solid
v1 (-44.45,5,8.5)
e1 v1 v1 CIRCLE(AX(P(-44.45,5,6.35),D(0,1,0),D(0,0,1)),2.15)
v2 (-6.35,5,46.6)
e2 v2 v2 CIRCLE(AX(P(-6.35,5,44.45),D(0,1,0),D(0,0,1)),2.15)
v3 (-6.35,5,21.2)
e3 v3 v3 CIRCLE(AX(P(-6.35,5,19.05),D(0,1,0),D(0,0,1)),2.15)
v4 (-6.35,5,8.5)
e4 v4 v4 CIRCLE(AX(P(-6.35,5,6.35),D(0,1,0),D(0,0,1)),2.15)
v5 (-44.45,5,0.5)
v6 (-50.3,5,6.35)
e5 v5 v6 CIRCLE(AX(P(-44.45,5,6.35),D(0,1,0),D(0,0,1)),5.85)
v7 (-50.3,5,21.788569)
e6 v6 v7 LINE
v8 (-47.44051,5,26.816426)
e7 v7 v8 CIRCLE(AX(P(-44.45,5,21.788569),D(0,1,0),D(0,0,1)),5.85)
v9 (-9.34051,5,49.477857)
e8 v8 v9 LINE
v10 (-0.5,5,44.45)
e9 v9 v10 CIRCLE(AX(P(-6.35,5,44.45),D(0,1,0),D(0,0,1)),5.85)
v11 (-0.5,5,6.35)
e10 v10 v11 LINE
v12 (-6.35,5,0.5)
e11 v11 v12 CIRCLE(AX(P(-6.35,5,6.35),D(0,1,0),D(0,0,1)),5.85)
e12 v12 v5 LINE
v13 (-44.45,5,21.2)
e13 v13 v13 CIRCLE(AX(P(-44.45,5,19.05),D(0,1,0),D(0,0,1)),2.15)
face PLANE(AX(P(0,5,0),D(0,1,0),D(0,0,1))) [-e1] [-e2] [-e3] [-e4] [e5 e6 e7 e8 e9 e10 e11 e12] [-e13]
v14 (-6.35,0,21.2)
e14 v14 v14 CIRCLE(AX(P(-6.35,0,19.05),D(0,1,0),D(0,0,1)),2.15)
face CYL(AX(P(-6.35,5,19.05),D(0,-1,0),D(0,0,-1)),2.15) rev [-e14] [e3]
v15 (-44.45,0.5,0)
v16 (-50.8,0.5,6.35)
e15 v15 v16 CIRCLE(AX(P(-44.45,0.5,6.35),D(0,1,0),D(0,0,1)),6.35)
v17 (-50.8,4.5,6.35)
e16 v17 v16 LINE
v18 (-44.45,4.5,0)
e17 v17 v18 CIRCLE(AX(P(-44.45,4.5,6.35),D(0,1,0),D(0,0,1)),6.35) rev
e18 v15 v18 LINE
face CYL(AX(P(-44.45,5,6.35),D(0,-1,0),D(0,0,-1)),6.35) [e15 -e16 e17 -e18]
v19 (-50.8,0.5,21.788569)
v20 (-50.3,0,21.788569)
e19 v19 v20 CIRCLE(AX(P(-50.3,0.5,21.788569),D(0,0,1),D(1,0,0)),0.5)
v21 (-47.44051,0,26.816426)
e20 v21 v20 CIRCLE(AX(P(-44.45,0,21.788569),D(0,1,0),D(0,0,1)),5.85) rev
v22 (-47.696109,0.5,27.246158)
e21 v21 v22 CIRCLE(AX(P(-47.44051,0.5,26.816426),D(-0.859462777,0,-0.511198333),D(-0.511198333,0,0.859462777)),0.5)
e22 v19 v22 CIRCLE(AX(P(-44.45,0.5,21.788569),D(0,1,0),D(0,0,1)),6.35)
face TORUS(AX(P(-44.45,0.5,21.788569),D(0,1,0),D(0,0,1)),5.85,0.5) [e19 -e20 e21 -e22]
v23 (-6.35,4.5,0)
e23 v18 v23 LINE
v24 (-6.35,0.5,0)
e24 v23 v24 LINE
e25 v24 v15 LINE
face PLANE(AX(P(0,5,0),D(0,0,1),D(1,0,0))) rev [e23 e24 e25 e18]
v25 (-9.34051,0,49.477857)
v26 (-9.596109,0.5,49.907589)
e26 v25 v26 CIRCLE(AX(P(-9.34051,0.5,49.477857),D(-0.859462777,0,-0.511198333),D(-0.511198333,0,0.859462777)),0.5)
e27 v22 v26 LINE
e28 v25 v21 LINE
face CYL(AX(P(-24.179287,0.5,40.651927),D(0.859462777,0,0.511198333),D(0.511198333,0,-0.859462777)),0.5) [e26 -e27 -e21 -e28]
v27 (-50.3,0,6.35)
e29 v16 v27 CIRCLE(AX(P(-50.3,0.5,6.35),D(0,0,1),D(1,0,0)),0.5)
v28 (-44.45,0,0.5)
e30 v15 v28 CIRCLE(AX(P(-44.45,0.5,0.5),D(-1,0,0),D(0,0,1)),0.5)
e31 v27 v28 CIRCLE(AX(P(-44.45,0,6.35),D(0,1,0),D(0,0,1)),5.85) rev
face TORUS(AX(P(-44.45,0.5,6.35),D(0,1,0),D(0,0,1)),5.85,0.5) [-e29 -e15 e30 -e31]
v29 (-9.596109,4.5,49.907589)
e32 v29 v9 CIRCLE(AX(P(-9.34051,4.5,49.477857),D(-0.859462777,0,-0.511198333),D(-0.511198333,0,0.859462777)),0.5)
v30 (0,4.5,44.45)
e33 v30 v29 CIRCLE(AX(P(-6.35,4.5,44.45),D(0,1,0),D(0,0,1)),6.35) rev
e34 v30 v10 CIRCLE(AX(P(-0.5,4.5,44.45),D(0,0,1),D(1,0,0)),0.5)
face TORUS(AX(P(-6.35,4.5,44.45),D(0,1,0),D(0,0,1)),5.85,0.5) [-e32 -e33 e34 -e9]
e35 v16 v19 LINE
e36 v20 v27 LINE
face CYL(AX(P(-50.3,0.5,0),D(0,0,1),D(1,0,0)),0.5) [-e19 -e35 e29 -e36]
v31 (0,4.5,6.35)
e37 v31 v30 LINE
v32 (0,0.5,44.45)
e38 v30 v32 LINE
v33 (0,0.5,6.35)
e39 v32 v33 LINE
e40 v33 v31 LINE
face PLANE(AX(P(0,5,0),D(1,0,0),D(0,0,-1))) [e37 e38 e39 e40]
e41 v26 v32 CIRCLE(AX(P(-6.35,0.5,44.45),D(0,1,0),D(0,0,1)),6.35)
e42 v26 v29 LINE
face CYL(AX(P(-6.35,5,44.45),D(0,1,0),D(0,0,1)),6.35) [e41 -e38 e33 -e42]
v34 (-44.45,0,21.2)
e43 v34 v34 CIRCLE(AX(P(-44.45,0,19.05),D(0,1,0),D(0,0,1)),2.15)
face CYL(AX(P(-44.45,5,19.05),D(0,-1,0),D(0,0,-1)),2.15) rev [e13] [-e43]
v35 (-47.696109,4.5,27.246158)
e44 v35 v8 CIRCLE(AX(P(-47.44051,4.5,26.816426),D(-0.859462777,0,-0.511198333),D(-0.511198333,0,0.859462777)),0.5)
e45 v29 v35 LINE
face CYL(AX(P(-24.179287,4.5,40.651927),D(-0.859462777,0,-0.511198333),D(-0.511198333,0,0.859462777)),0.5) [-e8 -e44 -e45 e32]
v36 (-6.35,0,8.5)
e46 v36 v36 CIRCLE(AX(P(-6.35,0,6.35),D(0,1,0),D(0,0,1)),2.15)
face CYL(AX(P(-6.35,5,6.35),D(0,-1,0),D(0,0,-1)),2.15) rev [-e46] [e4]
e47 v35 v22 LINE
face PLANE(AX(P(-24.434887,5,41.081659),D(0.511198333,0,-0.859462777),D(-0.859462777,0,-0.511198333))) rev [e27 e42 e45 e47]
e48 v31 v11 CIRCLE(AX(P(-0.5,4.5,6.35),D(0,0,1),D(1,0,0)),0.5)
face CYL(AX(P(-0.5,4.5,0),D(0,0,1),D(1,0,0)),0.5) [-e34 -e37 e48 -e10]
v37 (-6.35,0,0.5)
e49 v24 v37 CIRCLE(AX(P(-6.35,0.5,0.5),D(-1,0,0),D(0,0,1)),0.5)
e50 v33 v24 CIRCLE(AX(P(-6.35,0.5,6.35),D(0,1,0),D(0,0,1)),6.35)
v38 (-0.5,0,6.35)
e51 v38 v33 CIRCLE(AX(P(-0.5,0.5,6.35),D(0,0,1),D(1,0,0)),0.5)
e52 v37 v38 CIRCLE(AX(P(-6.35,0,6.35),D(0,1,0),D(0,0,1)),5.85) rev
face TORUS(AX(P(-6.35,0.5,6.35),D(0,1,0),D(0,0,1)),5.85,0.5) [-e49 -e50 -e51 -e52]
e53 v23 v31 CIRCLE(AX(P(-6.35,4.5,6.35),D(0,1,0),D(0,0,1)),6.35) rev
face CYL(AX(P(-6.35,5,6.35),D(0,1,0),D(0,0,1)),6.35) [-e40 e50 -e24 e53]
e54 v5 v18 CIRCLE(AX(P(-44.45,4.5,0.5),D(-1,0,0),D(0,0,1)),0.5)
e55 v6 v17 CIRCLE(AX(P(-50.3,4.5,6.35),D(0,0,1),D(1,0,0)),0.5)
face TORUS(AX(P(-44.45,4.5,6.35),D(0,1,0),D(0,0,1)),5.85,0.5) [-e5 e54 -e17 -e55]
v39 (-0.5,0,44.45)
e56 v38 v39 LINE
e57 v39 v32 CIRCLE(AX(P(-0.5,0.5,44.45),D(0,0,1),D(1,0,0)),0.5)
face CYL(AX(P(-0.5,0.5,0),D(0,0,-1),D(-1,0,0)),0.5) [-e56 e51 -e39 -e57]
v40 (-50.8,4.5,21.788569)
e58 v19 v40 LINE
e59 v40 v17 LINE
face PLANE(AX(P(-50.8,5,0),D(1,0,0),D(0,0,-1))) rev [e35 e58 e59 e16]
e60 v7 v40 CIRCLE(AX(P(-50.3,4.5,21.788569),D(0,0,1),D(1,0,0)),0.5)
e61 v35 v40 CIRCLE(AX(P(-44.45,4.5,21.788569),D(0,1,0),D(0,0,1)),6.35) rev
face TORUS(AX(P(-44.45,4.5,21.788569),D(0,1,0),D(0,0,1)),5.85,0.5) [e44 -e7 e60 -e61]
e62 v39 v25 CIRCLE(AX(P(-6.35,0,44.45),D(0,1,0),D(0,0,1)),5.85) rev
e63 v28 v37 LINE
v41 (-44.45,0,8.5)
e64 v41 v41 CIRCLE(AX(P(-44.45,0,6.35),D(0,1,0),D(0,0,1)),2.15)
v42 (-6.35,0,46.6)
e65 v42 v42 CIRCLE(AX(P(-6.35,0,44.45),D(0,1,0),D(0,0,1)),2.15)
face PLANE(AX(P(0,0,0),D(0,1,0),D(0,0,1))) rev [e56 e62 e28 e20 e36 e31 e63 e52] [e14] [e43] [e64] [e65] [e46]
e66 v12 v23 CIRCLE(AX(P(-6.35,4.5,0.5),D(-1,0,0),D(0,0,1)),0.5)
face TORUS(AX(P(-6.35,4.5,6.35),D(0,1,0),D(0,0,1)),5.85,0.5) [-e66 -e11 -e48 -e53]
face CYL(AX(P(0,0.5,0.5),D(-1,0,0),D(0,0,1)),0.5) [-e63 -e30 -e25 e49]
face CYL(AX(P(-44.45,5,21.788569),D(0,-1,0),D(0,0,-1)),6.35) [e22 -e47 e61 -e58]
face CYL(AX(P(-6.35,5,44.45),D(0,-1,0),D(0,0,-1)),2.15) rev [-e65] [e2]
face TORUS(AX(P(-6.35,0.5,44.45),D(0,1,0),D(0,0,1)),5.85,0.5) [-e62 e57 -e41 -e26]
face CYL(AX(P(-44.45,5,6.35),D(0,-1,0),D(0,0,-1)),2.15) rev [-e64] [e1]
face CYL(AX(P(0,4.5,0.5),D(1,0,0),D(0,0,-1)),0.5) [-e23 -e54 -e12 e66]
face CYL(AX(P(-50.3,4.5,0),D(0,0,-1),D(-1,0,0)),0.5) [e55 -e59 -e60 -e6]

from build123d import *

# Parameters (mm, degrees)
SKETCH1_W           = 50.8
SKETCH1_H           = 25.4
SKETCH1_R           = 2.15
BOSS_EXTRUDE1_DEPTH = 5
FILLET1_R           = 6.35
FILLET2_R           = 6.35
FILLET3_R           = 0.5


with BuildPart() as part:
    # Sketch1 → Boss-Extrude1 (new body)
    # profile 1 of 2: a face of its own
    with BuildSketch(Plane(origin=(0, 0, 0), x_dir=(1, 0, 0), z_dir=(0, 1, 0))):
        with Locations((-25.4, -12.7)):
            Rectangle(SKETCH1_W, SKETCH1_H)
        with Locations(Location((-44.45, -19.05, 0), (0, 0, 270))):
            Circle(SKETCH1_R, mode=Mode.SUBTRACT)
        with Locations(Location((-6.35, -19.05, 0), (0, 0, 270))):
            Circle(SKETCH1_R, mode=Mode.SUBTRACT)
        with Locations(Location((-6.35, -6.35, 0), (0, 0, 270))):
            Circle(SKETCH1_R, mode=Mode.SUBTRACT)
        with Locations(Location((-44.45, -6.35, 0), (0, 0, 270))):
            Circle(SKETCH1_R, mode=Mode.SUBTRACT)
    # profile 2 of 2: a face of its own
    with BuildSketch(Plane(origin=(0, 0, 0), x_dir=(1, 0, 0), z_dir=(0, 1, 0))):
        Polygon((0, -51.838336263), (0, -25.4), (-50.8, -25.4), (-25.653556262, -40.356808445), (-6.35, -51.838336263), align=None)
        with Locations(Location((-6.35, -44.45, 0), (0, 0, 270))):
            Circle(SKETCH1_R, mode=Mode.SUBTRACT)
    extrude(amount=BOSS_EXTRUDE1_DEPTH)

    # Fillet1
    fillet1_edges = [part.edges().sort_by_distance(p)[0] for p in [
        (0, 2.5, 0),
        (-50.8, 2.5, 0),
        (-50.8, 2.5, 25.4),
        (0, 2.5, 51.838336263),
    ]]
    fillet(fillet1_edges, radius=FILLET1_R - 0.0001)  # a hair under: the kernel refuses the full size

    # Fillet2
    fillet2_edges = [part.edges().sort_by_distance(p)[0] for p in [
        (-6.35, 2.5, 51.838336263),
    ]]
    fillet(fillet2_edges, radius=FILLET2_R - 0.0004)  # a hair under: the kernel refuses the full size

    # Fillet3
    fillet3_edges = [part.edges().sort_by_distance(p)[0] for p in [
        (0, 0, 25.400301661),
        (0, 5, 25.400301661),
        (-25.4, 0, 0),
        (-28.645831614, 0, 38.577038322),
        (-50.8, 0, 14.069262895),
        (-49.969763738, 0, 24.927820308),
        (-48.94015735, 0, 1.85984265),
        (-1.85984265, 0, 1.85984265),
        (-25.4, 5, 0),
        (-50.8, 5, 14.069262895),
        (-28.645831614, 5, 38.577038322),
        (-49.969763738, 5, 24.927820308),
        (-48.94015735, 5, 1.85984265),
        (-1.85984265, 5, 1.85984265),
        (-3.210553792, 0, 49.970106285),
        (-3.210553792, 5, 49.970106285),
    ]]
    fillet(fillet3_edges, radius=FILLET3_R)


solid = part.part
